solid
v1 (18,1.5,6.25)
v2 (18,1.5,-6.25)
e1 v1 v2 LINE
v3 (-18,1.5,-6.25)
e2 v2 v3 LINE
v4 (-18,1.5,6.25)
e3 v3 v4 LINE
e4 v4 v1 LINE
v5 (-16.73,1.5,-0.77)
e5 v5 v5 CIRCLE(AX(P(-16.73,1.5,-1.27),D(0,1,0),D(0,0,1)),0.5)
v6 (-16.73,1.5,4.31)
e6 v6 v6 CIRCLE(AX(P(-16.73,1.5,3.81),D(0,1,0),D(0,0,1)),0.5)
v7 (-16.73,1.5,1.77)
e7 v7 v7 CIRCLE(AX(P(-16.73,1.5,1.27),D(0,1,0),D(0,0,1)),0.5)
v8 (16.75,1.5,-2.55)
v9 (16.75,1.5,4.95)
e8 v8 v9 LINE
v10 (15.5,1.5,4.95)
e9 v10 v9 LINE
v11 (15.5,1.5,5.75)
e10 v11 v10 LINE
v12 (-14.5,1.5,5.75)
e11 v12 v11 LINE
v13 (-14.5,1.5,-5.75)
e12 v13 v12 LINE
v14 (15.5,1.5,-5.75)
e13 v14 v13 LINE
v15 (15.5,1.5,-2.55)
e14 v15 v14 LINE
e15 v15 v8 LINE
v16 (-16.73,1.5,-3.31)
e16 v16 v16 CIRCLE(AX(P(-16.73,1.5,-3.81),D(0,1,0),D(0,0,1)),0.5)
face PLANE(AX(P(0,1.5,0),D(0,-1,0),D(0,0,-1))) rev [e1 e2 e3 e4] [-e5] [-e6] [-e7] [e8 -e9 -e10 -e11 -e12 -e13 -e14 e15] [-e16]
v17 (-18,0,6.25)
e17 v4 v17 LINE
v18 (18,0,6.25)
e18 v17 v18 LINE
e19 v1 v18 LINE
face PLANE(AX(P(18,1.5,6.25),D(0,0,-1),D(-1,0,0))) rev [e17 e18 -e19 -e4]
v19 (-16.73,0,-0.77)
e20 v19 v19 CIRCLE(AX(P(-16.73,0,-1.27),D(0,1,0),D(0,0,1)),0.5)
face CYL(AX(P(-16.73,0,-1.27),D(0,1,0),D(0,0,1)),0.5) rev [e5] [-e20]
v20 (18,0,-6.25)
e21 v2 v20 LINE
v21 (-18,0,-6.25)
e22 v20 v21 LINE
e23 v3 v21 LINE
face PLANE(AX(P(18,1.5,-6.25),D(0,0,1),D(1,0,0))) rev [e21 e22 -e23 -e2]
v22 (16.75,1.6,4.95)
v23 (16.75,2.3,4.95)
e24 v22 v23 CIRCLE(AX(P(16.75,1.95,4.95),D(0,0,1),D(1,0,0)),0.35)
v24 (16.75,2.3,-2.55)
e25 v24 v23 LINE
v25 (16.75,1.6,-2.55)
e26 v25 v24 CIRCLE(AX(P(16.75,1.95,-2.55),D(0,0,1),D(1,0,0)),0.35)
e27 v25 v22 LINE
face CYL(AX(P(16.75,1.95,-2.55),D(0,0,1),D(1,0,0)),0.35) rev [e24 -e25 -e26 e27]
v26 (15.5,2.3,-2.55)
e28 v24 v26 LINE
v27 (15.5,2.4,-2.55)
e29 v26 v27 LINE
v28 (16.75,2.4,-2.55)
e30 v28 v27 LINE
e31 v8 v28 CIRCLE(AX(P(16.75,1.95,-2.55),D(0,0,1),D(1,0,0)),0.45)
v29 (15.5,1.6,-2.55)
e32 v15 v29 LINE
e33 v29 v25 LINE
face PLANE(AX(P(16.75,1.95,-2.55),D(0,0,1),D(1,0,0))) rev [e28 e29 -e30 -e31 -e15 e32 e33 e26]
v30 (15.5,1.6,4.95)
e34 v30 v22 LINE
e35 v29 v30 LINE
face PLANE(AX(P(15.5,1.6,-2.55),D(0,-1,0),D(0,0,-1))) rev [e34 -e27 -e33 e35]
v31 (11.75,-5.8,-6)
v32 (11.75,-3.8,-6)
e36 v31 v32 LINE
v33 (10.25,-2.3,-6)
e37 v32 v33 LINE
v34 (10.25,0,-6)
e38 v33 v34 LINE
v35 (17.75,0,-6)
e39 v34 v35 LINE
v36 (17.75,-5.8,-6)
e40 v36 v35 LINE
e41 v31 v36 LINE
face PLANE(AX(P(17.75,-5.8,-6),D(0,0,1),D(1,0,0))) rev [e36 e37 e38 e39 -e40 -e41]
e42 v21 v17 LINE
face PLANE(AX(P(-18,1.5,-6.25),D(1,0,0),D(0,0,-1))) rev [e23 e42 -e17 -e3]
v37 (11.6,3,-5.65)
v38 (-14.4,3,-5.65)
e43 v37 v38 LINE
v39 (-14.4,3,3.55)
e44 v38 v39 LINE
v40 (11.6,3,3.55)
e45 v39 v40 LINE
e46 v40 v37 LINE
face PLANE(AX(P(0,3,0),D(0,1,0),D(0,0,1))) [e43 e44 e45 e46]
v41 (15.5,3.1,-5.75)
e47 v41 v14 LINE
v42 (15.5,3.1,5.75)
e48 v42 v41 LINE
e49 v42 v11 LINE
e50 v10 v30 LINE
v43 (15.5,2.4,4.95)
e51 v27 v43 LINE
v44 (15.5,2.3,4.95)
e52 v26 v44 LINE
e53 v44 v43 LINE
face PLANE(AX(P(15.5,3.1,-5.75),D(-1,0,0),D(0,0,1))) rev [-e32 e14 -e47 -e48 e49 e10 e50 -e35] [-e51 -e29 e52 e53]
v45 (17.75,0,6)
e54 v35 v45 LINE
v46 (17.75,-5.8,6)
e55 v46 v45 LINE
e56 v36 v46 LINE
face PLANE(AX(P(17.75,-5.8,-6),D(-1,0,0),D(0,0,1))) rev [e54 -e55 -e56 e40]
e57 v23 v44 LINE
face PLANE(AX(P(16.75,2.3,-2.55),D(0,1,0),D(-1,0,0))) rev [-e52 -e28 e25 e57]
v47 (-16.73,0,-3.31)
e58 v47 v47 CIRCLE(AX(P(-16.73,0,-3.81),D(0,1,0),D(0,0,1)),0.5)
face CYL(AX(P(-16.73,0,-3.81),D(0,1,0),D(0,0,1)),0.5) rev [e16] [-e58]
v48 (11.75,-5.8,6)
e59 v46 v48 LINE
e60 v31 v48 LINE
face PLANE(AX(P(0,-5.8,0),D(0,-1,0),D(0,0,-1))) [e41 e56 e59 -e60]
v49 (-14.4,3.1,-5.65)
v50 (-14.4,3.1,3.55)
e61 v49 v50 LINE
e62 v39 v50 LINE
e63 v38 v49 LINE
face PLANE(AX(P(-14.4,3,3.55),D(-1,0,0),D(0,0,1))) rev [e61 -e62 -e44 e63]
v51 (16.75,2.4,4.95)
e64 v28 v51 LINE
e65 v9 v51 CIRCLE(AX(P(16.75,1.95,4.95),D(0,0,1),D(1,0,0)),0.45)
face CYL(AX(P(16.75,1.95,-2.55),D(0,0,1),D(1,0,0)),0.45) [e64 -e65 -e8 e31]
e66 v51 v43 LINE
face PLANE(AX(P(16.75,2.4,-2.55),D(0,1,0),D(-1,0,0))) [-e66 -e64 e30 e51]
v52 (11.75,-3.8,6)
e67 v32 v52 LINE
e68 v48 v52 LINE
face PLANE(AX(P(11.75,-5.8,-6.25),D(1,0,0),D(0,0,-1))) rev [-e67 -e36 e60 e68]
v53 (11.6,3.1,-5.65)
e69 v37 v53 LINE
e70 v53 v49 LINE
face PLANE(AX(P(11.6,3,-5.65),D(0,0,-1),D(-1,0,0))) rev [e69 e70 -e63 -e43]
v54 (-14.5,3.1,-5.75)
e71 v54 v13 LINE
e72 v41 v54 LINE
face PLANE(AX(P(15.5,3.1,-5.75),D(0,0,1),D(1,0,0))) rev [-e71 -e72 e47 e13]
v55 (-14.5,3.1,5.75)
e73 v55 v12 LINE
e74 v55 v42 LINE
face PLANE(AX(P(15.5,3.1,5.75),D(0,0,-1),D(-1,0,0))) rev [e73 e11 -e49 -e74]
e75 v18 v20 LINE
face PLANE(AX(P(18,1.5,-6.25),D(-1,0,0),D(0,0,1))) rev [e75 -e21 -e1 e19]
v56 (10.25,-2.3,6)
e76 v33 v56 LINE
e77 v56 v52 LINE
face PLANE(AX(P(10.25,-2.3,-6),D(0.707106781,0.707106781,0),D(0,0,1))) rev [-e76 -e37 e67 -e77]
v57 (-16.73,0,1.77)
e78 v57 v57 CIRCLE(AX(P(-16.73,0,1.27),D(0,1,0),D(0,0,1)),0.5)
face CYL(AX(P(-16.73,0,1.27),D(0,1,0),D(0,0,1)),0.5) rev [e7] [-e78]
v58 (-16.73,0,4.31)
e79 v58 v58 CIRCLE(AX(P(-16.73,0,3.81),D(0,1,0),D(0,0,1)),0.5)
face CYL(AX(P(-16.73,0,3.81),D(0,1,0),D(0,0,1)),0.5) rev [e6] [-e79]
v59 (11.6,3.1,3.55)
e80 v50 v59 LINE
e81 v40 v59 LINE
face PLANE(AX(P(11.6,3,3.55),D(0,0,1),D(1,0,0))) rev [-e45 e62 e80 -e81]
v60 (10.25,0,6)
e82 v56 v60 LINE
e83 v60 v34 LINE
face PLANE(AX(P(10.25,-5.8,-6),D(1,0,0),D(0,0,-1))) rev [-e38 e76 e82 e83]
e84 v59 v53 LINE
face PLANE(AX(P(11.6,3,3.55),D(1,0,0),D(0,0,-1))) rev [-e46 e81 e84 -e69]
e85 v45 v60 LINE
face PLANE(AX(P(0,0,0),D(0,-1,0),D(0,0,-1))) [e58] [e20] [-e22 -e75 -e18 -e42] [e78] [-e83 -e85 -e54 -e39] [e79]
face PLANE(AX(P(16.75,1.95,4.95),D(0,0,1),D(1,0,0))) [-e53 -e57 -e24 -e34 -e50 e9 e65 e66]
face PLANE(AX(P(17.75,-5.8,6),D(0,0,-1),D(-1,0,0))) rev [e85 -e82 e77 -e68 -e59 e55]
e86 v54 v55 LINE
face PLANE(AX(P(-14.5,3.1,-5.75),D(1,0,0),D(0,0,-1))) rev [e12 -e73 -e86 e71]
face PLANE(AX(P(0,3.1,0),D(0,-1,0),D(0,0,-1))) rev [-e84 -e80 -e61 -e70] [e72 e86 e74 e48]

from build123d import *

# Parameters (mm, degrees)
SKETCH1_W           = 36
SKETCH1_H           = 12.5
BOSS_EXTRUDE1_DEPTH = 1.5
SKETCH2_R           = 0.5
CUT_EXTRUDE1_DEPTH  = 20.113149924
LPATTERN1_COUNT     = 4
LPATTERN1_PITCH     = 2.54
SKETCH3_W           = 7.5
SKETCH3_H           = 12
BOSS_EXTRUDE2_DEPTH = 5.8
SKETCH4_W           = 1.5
SKETCH4_H           = 2
CUT_EXTRUDE2_DEPTH  = 23.532254659
CHAMFER1_SIZE       = 1.5
SKETCH5_W           = 30
SKETCH5_H           = 11.5
BOSS_EXTRUDE3_DEPTH = 1.6
EXTRUDE_THIN1_START = -0.8
EXTRUDE_THIN1_DEPTH = 7.5
SKETCH7_W           = 26
SKETCH7_H           = 9.2
CUT_EXTRUDE3_DEPTH  = 0.1


with BuildPart() as part:
    # Sketch1 → Boss-Extrude1 (new body)
    with BuildSketch(Plane(origin=(0, 0, 0), x_dir=(1, 0, 0), z_dir=(0, 1, 0))):
        Rectangle(SKETCH1_W, SKETCH1_H)
    extrude(amount=BOSS_EXTRUDE1_DEPTH)

    # Sketch2 → Cut-Extrude1 (cut, through all)
    with BuildSketch(Plane(origin=(0, 1.5, 0), x_dir=(1, 0, 0), z_dir=(0, 1, 0))):
        with Locations(Location((-16.73, -3.81, 0), (0, 0, 270))):
            Circle(SKETCH2_R)
    cut_extrude1 = extrude(amount=-CUT_EXTRUDE1_DEPTH, mode=Mode.SUBTRACT)

    # LPattern1: Cut-Extrude1 ×4
    with Locations(*[(0, 0, -i * LPATTERN1_PITCH) for i in range(1, LPATTERN1_COUNT)]):
        add(cut_extrude1, mode=Mode.SUBTRACT)

    # Sketch3 → Boss-Extrude2 (add)
    with BuildSketch(Plane.XZ):
        with Locations((14, 0)):
            Rectangle(SKETCH3_W, SKETCH3_H)
    extrude(amount=BOSS_EXTRUDE2_DEPTH)

    # Sketch4 → Cut-Extrude2 (cut, through all)
    with BuildSketch(Plane.XY.offset(6)):
        with Locations((11, -4.8)):
            Rectangle(SKETCH4_W, SKETCH4_H)
    extrude(amount=-CUT_EXTRUDE2_DEPTH, mode=Mode.SUBTRACT)

    # Chamfer1
    chamfer1_edges = [part.edges().sort_by_distance(p)[0] for p in [
        (10.25, -3.8, 0),
    ]]
    chamfer(chamfer1_edges, length=CHAMFER1_SIZE - 0.0001)  # a hair under: the kernel refuses the full size

    # Sketch5 → Boss-Extrude3 (add)
    with BuildSketch(Plane(origin=(0, 1.5, 0), x_dir=(1, 0, 0), z_dir=(0, 1, 0))):
        with Locations((0.5, 0)):
            Rectangle(SKETCH5_W, SKETCH5_H)
    extrude(amount=BOSS_EXTRUDE3_DEPTH)

    # Sketch6 → Extrude-Thin1 (add)
    with BuildSketch(Plane.XY.offset(5.75).offset(EXTRUDE_THIN1_START)):
        with BuildLine():
            Line((15.5, 1.5), (16.75, 1.5))
            ThreePointArc((16.75, 1.5), (17.2, 1.95), (16.75, 2.4))
            Line((16.75, 2.4), (15.5, 2.4))
            Line((15.5, 2.4), (15.5, 2.3))
            Line((15.5, 2.3), (16.75, 2.3))
            ThreePointArc((16.75, 2.3), (17.1, 1.95), (16.75, 1.6))
            Line((16.75, 1.6), (15.5, 1.6))
            Line((15.5, 1.6), (15.5, 1.5))
        make_face()
    extrude(amount=-EXTRUDE_THIN1_DEPTH)

    # Sketch7 → Cut-Extrude3 (cut)
    with BuildSketch(Plane(origin=(0, 3.1, 0), x_dir=(1, 0, 0), z_dir=(0, 1, 0))):
        with Locations((-1.4, 1.05)):
            Rectangle(SKETCH7_W, SKETCH7_H)
    extrude(amount=-CUT_EXTRUDE3_DEPTH, mode=Mode.SUBTRACT)


solid = part.part
